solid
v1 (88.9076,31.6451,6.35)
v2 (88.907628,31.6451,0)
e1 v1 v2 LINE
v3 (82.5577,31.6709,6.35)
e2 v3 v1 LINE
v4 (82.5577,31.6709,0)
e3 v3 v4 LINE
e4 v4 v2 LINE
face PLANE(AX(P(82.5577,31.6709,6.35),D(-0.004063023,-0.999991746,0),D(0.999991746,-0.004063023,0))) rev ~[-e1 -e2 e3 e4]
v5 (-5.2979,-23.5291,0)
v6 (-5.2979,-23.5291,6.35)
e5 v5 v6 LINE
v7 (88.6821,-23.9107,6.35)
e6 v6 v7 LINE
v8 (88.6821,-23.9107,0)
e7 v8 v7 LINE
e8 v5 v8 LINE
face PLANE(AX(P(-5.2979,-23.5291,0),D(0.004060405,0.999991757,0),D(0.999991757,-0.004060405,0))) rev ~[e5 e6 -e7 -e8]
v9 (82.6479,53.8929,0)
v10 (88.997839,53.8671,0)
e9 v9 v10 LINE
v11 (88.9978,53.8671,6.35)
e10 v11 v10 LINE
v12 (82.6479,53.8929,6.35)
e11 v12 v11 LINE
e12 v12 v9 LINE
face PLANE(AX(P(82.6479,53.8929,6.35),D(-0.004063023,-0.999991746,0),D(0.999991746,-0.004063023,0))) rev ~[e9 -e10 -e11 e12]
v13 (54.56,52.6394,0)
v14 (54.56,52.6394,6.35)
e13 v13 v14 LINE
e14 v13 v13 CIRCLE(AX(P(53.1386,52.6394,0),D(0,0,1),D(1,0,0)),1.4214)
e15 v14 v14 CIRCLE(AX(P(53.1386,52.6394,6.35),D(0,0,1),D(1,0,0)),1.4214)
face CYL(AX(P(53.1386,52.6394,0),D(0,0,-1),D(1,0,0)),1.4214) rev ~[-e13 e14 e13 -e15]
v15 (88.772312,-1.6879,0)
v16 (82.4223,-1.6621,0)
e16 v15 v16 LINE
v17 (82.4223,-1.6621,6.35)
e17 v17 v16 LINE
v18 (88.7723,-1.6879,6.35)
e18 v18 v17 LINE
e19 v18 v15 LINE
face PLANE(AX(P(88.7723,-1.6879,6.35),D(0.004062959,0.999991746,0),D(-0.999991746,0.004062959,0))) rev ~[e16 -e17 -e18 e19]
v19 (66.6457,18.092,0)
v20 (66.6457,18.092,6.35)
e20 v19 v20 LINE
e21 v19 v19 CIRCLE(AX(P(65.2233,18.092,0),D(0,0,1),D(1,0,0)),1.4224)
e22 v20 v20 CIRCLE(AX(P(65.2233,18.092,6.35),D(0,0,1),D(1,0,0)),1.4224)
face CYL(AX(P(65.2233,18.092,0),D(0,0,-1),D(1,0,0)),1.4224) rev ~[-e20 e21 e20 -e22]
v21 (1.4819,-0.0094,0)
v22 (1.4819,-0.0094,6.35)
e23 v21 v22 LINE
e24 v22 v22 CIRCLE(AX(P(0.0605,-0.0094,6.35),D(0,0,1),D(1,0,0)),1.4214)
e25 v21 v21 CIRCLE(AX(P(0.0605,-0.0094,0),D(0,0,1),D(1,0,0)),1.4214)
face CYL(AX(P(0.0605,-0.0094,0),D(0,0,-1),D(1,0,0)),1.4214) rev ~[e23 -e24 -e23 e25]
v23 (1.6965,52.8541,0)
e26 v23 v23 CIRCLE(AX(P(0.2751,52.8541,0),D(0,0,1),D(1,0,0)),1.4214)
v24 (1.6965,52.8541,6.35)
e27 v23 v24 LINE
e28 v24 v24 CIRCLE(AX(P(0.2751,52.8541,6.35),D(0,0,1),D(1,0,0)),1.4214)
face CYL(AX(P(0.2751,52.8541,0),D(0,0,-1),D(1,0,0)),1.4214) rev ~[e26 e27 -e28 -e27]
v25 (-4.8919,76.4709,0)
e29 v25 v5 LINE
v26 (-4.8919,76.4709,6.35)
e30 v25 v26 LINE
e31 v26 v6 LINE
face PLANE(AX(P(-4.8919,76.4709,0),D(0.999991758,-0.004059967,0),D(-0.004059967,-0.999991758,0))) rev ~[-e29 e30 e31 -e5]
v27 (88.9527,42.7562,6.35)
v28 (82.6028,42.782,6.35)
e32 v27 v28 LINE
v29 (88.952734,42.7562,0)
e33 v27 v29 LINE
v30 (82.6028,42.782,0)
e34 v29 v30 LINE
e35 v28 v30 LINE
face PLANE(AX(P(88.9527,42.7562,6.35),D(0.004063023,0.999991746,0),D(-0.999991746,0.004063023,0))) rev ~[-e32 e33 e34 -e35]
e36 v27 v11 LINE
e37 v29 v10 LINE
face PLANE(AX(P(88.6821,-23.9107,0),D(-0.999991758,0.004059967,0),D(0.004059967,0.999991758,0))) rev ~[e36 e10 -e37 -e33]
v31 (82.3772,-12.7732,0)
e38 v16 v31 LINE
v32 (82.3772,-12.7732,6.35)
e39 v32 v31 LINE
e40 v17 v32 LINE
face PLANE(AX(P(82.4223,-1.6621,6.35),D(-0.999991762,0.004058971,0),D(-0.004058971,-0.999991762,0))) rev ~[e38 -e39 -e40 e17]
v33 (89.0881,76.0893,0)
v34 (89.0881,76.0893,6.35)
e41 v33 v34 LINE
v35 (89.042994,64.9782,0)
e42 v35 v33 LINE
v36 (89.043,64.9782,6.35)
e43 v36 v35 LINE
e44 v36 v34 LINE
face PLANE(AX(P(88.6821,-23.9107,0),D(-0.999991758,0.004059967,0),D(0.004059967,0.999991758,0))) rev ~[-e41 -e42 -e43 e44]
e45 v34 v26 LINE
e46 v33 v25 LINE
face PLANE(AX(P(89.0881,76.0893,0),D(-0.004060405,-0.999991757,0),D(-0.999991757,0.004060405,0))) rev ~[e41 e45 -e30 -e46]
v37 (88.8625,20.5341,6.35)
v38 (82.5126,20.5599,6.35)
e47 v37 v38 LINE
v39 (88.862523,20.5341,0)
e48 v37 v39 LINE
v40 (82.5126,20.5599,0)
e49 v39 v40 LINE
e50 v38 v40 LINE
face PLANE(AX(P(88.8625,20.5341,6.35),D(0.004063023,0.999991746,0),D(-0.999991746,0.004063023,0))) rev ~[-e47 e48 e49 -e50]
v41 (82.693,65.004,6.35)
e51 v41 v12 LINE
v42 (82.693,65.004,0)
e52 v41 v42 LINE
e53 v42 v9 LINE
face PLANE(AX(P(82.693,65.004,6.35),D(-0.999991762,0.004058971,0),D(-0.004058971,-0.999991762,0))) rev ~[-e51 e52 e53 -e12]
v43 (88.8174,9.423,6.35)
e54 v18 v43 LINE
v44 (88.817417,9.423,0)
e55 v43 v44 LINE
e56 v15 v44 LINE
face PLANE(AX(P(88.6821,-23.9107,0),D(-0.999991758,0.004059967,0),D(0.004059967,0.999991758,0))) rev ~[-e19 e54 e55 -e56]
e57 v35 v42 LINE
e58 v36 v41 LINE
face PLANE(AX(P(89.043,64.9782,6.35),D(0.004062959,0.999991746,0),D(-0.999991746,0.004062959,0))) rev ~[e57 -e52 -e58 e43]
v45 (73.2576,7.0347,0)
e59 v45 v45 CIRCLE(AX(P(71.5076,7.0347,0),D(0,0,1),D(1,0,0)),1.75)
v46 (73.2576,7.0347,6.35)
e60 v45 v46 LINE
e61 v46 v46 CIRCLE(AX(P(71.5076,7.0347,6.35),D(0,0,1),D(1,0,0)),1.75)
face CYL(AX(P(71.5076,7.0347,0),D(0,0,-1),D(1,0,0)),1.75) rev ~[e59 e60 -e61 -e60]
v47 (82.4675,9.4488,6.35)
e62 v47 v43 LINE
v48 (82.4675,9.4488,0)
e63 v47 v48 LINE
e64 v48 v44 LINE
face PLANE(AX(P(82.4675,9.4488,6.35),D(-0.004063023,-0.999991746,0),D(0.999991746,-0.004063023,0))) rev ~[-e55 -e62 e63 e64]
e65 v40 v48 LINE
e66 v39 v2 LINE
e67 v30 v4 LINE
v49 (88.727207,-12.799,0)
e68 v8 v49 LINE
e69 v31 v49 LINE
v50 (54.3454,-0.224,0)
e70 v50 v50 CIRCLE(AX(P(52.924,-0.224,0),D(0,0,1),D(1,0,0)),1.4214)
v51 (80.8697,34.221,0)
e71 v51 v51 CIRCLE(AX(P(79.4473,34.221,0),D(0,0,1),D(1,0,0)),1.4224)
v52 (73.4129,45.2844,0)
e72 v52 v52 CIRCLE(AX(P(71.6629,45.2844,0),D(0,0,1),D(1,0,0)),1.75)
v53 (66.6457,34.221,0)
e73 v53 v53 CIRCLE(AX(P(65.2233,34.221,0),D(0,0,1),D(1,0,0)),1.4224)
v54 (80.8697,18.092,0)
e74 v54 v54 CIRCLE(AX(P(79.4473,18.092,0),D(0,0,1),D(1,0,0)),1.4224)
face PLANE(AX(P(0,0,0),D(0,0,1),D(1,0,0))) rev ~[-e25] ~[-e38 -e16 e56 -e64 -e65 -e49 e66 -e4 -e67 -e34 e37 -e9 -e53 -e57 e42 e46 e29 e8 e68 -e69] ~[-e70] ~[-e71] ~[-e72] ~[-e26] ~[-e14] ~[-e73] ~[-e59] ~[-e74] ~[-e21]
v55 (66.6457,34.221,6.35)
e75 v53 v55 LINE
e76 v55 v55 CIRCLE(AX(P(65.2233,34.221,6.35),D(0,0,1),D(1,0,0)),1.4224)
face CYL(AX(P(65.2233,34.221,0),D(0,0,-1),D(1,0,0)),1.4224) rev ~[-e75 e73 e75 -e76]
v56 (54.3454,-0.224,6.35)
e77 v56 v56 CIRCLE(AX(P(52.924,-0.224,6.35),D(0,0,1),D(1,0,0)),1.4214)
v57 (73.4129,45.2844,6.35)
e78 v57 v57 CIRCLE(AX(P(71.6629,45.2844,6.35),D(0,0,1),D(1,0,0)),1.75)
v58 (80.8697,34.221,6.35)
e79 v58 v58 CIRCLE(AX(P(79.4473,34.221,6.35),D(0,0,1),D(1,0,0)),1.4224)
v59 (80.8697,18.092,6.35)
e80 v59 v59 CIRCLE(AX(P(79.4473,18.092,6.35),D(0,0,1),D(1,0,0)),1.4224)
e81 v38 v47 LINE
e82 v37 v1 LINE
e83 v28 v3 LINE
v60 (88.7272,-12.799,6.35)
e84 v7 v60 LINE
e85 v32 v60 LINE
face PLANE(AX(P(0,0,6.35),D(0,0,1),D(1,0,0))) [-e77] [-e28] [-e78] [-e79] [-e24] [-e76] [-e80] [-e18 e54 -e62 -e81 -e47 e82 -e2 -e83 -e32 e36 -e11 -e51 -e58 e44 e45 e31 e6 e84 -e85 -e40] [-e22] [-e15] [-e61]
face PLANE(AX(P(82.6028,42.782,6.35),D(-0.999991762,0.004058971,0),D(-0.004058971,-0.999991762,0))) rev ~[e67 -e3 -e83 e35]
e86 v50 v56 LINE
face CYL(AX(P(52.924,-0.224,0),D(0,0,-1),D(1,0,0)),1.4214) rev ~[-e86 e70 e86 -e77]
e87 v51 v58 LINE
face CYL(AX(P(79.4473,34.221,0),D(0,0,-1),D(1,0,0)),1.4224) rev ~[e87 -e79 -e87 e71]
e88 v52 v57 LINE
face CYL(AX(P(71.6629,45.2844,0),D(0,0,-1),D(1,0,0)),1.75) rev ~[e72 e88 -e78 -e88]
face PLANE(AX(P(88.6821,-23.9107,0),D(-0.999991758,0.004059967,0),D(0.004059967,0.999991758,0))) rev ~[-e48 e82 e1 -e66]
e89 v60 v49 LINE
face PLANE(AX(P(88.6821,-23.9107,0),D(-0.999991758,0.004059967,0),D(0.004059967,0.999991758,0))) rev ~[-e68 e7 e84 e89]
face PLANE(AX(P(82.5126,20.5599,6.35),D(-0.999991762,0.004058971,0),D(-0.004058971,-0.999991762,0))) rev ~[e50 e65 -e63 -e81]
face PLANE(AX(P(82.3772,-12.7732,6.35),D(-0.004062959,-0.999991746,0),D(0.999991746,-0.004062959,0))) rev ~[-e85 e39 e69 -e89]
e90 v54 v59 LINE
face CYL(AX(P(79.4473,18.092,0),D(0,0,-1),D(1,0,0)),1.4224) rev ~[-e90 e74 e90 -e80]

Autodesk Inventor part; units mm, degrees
ref_plane "YZ Plane" through (0, 0, 0) normal (1, 0, 0) x (0, 1, 0)
ref_plane "XZ Plane" through (0, 0, 0) normal (0, 1, 0) x (-1, 0, 0)
ref_plane "XY Plane" through (0, 0, 0) normal (0, 0, 1) x (1, 0, 0)
sketch "Sketch1" plane through (0, 0, 0) normal (0, 0, 1) x (1, 0, 0)
  circle A0 centre (0.2751, 52.8541) radius 1.4214
  circle A1 centre (53.1386, 52.6394) radius 1.4214
  circle A2 centre (52.924, -0.224) radius 1.4214
  circle A3 centre (0.0605, -0.0094) radius 1.4214
  circle A4 centre (0.2751, 52.8541) radius 1.4214
  circle A5 centre (0.0605, -0.0094) radius 1.4214
  circle A6 centre (52.924, -0.224) radius 1.4214
  circle A7 centre (53.1386, 52.6394) radius 1.4214
  line L0 (-5.2979, -23.5291) -> (88.6821, -23.9107)
  line L1 (88.6821, -23.9107) -> (89.0881, 76.0893)
  line L2 (89.0881, 76.0893) -> (-4.8919, 76.4709)
  line L3 (-4.8919, 76.4709) -> (-5.2979, -23.5291)
  line L4 (-5.2979, -23.5291) -> (2.9514, -23.54) construction
  circle A8 centre (26.5572, 26.3424) radius 11 construction
  circle A9 centre (41.9941, 10.7796) radius 1.5 construction
  circle A10 centre (10.9944, 10.9055) radius 1.5 construction
  circle A11 centre (11.1202, 41.9052) radius 1.5 construction
  circle A12 centre (42.12, 41.7793) radius 1.5 construction
  circle A13 centre (0.2148, 52.8996) radius 1.4224 construction
  circle A14 centre (0, 0) radius 1.4224 construction
  circle A15 centre (52.8996, -0.2148) radius 1.4224 construction
  circle A16 centre (53.1143, 52.6848) radius 1.4224 construction
  line L5 (-5.3215, -5.2784) -> (58.178, -5.5363) construction
  line L6 (58.178, -5.5363) -> (58.4358, 57.9632) construction
  line L7 (58.4358, 57.9632) -> (-5.0637, 58.221) construction
  line L8 (-5.0637, 58.221) -> (-5.3215, -5.2784) construction
  line L9 (88.8851, 26.0893) -> (-5.1926, 26.4713) construction
  line L10 (63.369, -2.4573) -> (63.4464, 16.5925) construction
  line L11 (63.5243, 35.7924) -> (63.6017, 54.8422) construction
  line L12 (63.5243, 35.7924) -> (82.5742, 35.715) construction
  line L13 (63.369, -2.4573) -> (82.4189, -2.5346) construction
  circle A17 centre (71.5076, 7.0347) radius 1.75
  circle A18 centre (71.6629, 45.2844) radius 1.75
  circle A19 centre (71.6629, 45.2844) radius 1.75 construction
  circle A20 centre (71.5076, 7.0347) radius 1.75 construction
  circle A21 centre (72.3353, 26.1565) radius 2.5 construction
  line L14 (65.2233, 18.092) -> (79.4473, 18.092) construction
  line L15 (79.4473, 18.092) -> (79.4473, 34.221) construction
  line L16 (79.4473, 34.221) -> (65.2233, 34.221) construction
  line L17 (65.2233, 34.221) -> (65.2233, 18.092) construction
  line L18 (65.2233, 18.092) -> (79.4473, 34.221) construction
  line L19 (79.4473, 18.092) -> (65.2233, 34.221) construction
  circle A22 centre (79.4473, 18.092) radius 1.4224
  circle A23 centre (65.2233, 18.092) radius 1.4224
  circle A24 centre (79.4473, 34.221) radius 1.4224
  circle A25 centre (65.2233, 34.221) radius 1.4224
  circle A26 centre (79.4473, 18.092) radius 2.6035 construction
  circle A27 centre (65.2233, 18.092) radius 2.6035 construction
  circle A28 centre (79.4473, 34.221) radius 2.6035 construction
  circle A29 centre (65.2233, 34.221) radius 2.6035 construction
  point P0 (0.0605, -0.0094)
  point P1 (88.9156, 66.1637)
  dimension "d7" = 100
  dimension "d8" = 93.98
  dimension "d38" = 3.5
  dimension "d39" = 3.5
  dimension "d40" = 14.224
  dimension "d41" = 16.129
  dimension "d42" = 2.8448
  dimension "d43" = 2.8448
  dimension "d44" = 2.8448
  dimension "d45" = 2.8448
  dimension "d46" = 5.207
  dimension "d47" = 5.207
  dimension "d48" = 5.207
  dimension "d49" = 5.207
extrude "Extrusion1" add sketch "Sketch1" along normal blind 6.35
sketch "Sketch2" plane through (0, 0, 6.35) normal (0, 0, 1) x (1, 0, 0)
  circle A0 centre (0.0605, -0.0094) radius 1.4214 construction
  circle A1 centre (52.924, -0.224) radius 1.4214 construction
  circle A2 centre (53.1386, 52.6394) radius 1.4214 construction
  circle A3 centre (0.2751, 52.8541) radius 1.4214 construction
  line L0 (-5.2979, -23.5291) -> (88.6821, -23.9107) construction
  line L1 (89.0881, 76.0893) -> (-4.8919, 76.4709) construction
  line L2 (-4.8919, 76.4709) -> (-5.2979, -23.5291) construction
  line L3 (89.0881, 76.0893) -> (89.043, 64.9782)
  line L4 (89.043, 64.9782) -> (82.693, 65.004)
  line L5 (82.693, 65.004) -> (82.6479, 53.8929)
  line L6 (82.6479, 53.8929) -> (88.9978, 53.8671)
  line L7 (89.043, 64.9782) -> (88.9978, 53.8671)
  line L8 (88.9979, 53.8673) -> (88.9527, 42.7562)
  line L9 (88.9527, 42.7562) -> (82.6028, 42.782)
  line L10 (82.6028, 42.782) -> (82.5577, 31.6709)
  line L11 (82.5577, 31.6709) -> (88.9076, 31.6451)
  line L12 (88.9527, 42.7562) -> (88.9076, 31.6451)
  line L13 (88.9076, 31.6453) -> (88.8625, 20.5341)
  line L14 (88.8625, 20.5341) -> (82.5126, 20.5599)
  line L15 (82.5126, 20.5599) -> (82.4675, 9.4488)
  line L16 (82.4675, 9.4488) -> (88.8174, 9.423)
  line L17 (88.8625, 20.5341) -> (88.8174, 9.423)
  line L18 (88.8174, 9.4232) -> (88.7723, -1.6879)
  line L19 (88.7723, -1.6879) -> (82.4223, -1.6621)
  line L20 (82.4223, -1.6621) -> (82.3772, -12.7732)
  line L21 (82.3772, -12.7732) -> (88.7272, -12.799)
  line L22 (88.7723, -1.6879) -> (88.7272, -12.799)
  point P0 (0, 0)
  dimension "d12" = 6.35
  dimension "d14" = 11.1111
  dimension "d31" = 22.2222
extrude "Extrusion2" cut sketch "Sketch2" against normal blind 25.4
equation "\"d14\" = d11"
equation "\"d11\" = 11.111111"
